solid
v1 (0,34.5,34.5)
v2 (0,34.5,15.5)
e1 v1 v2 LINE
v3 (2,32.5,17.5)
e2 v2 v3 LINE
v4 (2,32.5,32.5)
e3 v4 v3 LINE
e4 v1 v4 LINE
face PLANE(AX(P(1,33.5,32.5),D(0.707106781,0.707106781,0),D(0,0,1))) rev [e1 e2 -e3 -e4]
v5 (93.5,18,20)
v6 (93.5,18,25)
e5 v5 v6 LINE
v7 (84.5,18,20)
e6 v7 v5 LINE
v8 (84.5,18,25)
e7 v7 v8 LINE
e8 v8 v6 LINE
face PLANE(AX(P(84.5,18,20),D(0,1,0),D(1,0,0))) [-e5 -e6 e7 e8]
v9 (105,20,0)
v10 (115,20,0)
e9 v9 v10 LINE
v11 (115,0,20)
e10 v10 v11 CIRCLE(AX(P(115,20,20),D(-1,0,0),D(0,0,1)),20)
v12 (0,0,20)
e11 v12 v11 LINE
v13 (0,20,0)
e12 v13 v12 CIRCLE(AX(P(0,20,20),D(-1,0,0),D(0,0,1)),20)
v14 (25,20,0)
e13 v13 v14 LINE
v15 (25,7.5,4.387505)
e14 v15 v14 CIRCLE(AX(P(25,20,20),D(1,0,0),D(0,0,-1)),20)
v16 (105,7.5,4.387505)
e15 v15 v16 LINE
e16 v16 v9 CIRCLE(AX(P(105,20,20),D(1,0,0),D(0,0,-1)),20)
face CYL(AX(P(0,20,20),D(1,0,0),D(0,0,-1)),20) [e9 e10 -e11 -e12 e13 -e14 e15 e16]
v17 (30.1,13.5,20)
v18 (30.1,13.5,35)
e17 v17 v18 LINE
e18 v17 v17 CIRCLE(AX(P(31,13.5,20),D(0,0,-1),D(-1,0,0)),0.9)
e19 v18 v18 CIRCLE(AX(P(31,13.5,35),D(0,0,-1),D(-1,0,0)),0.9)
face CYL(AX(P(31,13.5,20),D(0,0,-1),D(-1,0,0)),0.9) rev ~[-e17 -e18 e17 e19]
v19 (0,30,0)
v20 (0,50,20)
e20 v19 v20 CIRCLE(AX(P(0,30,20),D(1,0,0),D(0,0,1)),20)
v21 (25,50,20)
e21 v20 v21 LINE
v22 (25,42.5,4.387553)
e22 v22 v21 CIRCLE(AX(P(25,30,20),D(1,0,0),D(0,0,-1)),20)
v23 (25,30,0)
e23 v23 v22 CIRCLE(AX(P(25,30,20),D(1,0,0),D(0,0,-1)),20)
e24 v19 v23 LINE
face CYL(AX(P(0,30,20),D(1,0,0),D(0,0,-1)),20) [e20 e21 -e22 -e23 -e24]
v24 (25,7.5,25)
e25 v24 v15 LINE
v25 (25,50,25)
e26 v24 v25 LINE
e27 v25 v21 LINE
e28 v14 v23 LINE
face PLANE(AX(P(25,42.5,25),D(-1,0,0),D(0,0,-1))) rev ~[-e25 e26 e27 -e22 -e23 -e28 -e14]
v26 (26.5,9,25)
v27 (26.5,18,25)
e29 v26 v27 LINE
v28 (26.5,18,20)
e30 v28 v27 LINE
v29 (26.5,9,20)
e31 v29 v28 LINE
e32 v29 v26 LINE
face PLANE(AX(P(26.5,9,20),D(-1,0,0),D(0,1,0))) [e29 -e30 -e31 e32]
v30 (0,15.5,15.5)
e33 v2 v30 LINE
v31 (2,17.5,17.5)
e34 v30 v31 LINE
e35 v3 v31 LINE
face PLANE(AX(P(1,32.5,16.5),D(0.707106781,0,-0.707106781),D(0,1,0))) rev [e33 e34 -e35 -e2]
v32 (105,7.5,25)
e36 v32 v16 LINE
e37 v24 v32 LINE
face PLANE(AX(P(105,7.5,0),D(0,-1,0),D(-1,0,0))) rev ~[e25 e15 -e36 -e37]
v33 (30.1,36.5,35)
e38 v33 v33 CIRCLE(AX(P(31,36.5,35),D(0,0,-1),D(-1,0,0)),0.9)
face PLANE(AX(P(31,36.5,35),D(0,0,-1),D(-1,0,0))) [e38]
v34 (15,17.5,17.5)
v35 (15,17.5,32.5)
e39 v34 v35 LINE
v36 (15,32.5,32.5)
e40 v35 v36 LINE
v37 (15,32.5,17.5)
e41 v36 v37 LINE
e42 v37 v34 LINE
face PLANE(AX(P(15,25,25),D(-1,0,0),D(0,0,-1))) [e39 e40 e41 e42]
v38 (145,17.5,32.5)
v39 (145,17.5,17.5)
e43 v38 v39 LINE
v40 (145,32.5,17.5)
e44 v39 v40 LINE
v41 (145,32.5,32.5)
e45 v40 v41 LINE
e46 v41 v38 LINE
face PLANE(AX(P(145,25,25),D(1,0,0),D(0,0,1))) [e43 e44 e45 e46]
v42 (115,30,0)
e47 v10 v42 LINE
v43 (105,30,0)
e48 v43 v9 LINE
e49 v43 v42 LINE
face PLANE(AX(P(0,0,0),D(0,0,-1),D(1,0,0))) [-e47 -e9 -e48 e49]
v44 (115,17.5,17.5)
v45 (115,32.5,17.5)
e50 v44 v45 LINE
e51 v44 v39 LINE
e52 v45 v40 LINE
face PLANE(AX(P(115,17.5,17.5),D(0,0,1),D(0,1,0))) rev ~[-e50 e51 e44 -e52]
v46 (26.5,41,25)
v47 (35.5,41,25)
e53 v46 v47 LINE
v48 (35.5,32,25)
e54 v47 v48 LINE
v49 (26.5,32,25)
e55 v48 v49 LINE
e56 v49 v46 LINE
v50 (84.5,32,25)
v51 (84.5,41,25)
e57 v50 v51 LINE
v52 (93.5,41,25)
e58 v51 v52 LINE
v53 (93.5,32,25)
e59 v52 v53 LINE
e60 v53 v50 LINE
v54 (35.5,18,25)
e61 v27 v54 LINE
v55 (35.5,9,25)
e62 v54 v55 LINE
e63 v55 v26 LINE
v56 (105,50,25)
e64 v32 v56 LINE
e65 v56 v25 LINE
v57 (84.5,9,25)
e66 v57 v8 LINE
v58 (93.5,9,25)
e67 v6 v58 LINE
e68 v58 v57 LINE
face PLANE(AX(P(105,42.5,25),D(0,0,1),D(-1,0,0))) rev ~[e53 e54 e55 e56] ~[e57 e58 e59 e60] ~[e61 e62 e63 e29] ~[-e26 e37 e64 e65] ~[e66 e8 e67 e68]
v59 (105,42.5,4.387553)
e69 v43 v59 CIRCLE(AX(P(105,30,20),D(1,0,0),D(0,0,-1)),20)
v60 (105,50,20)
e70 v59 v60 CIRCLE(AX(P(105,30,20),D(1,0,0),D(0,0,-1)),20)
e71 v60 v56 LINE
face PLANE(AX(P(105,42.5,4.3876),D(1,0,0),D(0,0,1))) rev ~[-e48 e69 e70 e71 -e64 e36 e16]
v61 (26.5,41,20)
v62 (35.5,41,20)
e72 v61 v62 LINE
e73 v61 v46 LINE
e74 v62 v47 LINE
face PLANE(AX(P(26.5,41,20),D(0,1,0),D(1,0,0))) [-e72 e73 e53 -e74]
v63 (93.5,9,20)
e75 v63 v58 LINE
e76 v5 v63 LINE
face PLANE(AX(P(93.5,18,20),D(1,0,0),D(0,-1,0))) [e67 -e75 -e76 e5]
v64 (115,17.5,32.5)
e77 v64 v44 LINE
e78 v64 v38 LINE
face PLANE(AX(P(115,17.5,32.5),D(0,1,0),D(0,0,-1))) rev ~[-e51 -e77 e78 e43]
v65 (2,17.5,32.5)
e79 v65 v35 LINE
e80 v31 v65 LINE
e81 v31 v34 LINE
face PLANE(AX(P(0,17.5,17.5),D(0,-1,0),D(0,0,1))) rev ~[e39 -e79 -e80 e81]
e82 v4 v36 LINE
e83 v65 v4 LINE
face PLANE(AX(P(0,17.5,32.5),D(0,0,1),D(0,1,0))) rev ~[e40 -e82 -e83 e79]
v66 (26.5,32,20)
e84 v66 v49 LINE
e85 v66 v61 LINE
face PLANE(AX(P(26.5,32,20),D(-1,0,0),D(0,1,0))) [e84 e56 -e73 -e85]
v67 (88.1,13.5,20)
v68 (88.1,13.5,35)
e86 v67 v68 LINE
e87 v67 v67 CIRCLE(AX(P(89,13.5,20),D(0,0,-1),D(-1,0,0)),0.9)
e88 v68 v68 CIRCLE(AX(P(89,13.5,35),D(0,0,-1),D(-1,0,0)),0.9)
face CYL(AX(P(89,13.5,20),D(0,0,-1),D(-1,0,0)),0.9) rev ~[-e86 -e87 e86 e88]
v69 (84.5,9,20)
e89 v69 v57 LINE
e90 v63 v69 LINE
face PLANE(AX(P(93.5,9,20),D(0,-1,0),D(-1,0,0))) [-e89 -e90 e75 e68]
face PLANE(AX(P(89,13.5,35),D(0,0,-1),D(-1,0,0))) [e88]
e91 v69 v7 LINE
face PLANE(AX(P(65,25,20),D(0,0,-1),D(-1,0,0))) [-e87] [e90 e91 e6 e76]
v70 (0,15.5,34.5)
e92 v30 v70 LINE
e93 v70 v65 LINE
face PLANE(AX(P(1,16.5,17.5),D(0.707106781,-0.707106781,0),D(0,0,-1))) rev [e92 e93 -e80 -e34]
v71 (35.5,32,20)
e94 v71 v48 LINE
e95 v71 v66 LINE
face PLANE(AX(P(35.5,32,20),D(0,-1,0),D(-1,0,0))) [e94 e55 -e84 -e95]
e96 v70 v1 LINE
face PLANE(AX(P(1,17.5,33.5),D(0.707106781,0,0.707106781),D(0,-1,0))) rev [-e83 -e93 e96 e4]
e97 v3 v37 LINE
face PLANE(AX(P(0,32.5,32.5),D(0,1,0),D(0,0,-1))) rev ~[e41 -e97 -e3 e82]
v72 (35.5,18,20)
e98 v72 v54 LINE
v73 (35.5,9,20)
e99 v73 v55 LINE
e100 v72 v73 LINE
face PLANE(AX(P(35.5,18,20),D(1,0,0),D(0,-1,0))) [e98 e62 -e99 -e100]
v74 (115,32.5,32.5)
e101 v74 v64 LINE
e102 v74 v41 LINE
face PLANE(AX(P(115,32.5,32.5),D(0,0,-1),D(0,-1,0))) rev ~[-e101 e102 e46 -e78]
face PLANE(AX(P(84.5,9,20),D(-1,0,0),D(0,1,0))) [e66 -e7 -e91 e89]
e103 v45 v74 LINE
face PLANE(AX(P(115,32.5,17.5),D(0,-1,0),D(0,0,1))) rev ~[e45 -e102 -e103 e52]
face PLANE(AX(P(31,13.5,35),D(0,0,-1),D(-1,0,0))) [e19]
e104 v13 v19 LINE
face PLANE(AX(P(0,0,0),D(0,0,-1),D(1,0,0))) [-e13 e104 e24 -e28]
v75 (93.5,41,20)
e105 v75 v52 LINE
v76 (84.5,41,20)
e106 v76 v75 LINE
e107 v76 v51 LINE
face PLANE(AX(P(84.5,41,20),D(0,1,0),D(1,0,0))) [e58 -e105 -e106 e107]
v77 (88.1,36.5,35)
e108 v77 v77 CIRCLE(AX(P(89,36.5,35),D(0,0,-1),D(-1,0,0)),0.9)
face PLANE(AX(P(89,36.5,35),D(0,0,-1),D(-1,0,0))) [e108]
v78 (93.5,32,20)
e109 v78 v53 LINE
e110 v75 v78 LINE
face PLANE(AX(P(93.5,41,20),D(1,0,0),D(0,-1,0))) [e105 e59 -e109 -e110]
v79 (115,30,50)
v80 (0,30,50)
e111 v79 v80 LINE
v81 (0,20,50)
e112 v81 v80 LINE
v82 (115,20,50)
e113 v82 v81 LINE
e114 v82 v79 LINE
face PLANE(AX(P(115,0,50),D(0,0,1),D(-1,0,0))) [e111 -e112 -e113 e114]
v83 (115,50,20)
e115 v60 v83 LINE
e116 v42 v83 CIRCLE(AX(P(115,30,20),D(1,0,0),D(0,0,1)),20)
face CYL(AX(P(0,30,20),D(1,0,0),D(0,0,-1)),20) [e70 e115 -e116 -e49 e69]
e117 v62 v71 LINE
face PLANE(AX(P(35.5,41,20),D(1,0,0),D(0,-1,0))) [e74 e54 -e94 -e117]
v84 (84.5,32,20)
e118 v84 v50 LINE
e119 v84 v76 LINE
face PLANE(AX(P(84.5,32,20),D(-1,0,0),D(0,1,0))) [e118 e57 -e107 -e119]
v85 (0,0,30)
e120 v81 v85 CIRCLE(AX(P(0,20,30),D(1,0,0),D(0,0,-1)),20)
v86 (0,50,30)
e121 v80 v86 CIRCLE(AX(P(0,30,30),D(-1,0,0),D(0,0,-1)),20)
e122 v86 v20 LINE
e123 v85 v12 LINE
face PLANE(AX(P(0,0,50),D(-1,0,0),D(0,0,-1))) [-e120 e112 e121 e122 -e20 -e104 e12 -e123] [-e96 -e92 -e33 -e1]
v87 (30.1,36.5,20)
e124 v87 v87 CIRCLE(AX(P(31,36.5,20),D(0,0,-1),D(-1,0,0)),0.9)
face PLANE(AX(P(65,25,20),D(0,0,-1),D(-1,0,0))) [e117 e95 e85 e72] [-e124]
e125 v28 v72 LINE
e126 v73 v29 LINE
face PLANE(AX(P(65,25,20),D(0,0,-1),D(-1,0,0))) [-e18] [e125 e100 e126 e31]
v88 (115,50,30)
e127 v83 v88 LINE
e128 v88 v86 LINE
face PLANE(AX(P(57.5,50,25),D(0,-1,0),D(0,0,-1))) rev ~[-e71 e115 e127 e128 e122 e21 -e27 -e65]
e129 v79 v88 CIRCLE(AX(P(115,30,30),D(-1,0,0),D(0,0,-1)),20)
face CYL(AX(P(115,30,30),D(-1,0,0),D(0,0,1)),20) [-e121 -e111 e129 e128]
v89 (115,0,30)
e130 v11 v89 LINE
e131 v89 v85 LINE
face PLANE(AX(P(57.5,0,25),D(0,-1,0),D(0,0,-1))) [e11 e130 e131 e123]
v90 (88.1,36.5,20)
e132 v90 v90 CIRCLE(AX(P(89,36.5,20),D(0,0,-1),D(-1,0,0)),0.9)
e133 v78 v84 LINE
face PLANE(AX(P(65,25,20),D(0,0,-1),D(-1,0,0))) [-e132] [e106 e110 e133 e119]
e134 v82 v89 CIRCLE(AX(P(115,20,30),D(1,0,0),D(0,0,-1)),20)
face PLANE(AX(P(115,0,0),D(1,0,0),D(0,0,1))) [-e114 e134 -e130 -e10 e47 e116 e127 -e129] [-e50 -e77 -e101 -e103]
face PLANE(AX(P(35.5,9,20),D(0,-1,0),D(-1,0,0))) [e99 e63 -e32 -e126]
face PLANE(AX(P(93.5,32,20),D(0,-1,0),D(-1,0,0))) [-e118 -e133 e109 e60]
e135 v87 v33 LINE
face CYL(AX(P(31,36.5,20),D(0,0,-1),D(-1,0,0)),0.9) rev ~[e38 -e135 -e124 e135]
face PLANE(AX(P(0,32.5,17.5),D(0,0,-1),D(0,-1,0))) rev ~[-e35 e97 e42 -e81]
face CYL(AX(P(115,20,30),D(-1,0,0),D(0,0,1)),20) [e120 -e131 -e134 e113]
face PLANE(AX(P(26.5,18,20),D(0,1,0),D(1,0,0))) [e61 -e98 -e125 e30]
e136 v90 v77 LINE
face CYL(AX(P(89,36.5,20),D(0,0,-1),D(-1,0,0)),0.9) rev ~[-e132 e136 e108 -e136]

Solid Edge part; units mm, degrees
sketch "Sketch1" plane through (0, 0, 0) normal (0, -1, 0) x (1, 0, 0)
  line L0 (0, 0) -> (115, 0)
  line L1 (115, 0) -> (115, 50)
  line L2 (115, 50) -> (0, 50)
  line L3 (0, 50) -> (0, 0)
  dimension "D1" = 50
  dimension "D2" = 50
  dimension "D3" = 115
extrude "Protrusion1" add sketch "Sketch1" against normal blind 50
fillet "Verrundung_2" radius 20 4 edges at (57.5, 50, 50) (57.5, 50, 0) (57.5, 0, 50) (57.5, 0, 0)
sketch "Sketch2" plane through (0, 25, 25) normal (-1, 0, 0) x (0, 0, -1)
  line L0 (-7.5, -7.5) -> (7.5, -7.5)
  line L1 (7.5, -7.5) -> (7.5, 7.5)
  line L2 (7.5, 7.5) -> (-7.5, 7.5)
  line L3 (-7.5, 7.5) -> (-7.5, -7.5)
  dimension "D1" = 15
extrude "Extrusionsausschnitt_5" cut sketch "Sketch2" against normal blind 15
chamfer "Fase_3" distance 2 angle 45 4 edges at (0, 25, 32.5) (0, 17.5, 25) (0, 25, 17.5) (0, 32.5, 25)
sketch "Sketch3" plane through (115, 25, 25) normal (1, 0, 0) x (0, 1, 0)
  line L0 (-7.5, -7.5) -> (7.5, -7.5)
  line L1 (7.5, -7.5) -> (7.5, 7.5)
  line L2 (7.5, 7.5) -> (-7.5, 7.5)
  line L3 (-7.5, 7.5) -> (-7.5, -7.5)
  dimension "D1" = 15
extrude "Extrusionsausprägung_2" add sketch "Sketch3" along normal blind 30
sketch "Sketch4" plane through (57.5, 25, 0) normal (0, 0, -1) x (-1, 0, 0)
  line L0 (-47.5, -17.5) -> (32.5, -17.5)
  line L1 (32.5, -17.5) -> (32.5, 17.5)
  line L2 (32.5, 17.5) -> (-47.5, 17.5)
  line L3 (-47.5, 17.5) -> (-47.5, -17.5)
  dimension "D1" = 35
  dimension "D2" = 80
  dimension "D3" = 10
extrude "Extrusionsausschnitt_6" cut sketch "Sketch4" against normal blind 20
sketch "Sketch5" plane through (65, 25, 20) normal (0, 0, -1) x (-1, 0, 0)
  circle A0 centre (-24, 11.5) radius 0.9
  circle A1 centre (-24, -11.5) radius 0.9
  circle A2 centre (34, -11.5) radius 0.9
  circle A3 centre (34, 11.5) radius 0.9
  dimension "D1" = 58
  dimension "D2" = 23
  dimension "D3" = 6
  dimension "D4" = 1.8
extrude "Extrusionsausschnitt_7" cut sketch "Sketch5" against normal blind 15
sketch "Sketch6" plane through (65, 25, 20) normal (0, 0, -1) x (-1, 0, 0)
  line L0 (-40, 17.5) -> (40, 17.5)
  line L1 (40, 17.5) -> (40, -17.5)
  line L2 (40, -17.5) -> (-40, -17.5)
  line L3 (-40, -17.5) -> (-40, 17.5)
  line L4 (-28.5, 7) -> (-19.5, 7)
  line L5 (-19.5, 7) -> (-19.5, 16)
  line L6 (-19.5, 16) -> (-28.5, 16)
  line L7 (-28.5, 16) -> (-28.5, 7)
  line L8 (-28.5, -16) -> (-19.5, -16)
  line L9 (-19.5, -16) -> (-19.5, -7)
  line L10 (-19.5, -7) -> (-28.5, -7)
  line L11 (-28.5, -7) -> (-28.5, -16)
  line L12 (29.5, 7) -> (38.5, 7)
  line L13 (38.5, 7) -> (38.5, 16)
  line L14 (38.5, 16) -> (29.5, 16)
  line L15 (29.5, 16) -> (29.5, 7)
  line L16 (29.5, -16) -> (38.5, -16)
  line L17 (38.5, -16) -> (38.5, -7)
  line L18 (38.5, -7) -> (29.5, -7)
  line L19 (29.5, -7) -> (29.5, -16)
  dimension "D1" = 9
extrude "Extrusionsausschnitt_8" cut sketch "Sketch6" against normal blind 5
sketch "Sketch7" plane through (65, 42.5, 14.6938) normal (0, -1, 0) x (-1, 0, 0)
  line L0 (-40, -10.3062) -> (40, -10.3062)
  line L1 (40, -10.3062) -> (40, 10.3062)
  line L2 (40, 10.3062) -> (-40, 10.3062)
  line L3 (-40, 10.3062) -> (-40, -10.3062)
extrude "Extrusionsausschnitt_9" cut sketch "Sketch7" against normal blind 12
properties material "Nylon, allgemein"
